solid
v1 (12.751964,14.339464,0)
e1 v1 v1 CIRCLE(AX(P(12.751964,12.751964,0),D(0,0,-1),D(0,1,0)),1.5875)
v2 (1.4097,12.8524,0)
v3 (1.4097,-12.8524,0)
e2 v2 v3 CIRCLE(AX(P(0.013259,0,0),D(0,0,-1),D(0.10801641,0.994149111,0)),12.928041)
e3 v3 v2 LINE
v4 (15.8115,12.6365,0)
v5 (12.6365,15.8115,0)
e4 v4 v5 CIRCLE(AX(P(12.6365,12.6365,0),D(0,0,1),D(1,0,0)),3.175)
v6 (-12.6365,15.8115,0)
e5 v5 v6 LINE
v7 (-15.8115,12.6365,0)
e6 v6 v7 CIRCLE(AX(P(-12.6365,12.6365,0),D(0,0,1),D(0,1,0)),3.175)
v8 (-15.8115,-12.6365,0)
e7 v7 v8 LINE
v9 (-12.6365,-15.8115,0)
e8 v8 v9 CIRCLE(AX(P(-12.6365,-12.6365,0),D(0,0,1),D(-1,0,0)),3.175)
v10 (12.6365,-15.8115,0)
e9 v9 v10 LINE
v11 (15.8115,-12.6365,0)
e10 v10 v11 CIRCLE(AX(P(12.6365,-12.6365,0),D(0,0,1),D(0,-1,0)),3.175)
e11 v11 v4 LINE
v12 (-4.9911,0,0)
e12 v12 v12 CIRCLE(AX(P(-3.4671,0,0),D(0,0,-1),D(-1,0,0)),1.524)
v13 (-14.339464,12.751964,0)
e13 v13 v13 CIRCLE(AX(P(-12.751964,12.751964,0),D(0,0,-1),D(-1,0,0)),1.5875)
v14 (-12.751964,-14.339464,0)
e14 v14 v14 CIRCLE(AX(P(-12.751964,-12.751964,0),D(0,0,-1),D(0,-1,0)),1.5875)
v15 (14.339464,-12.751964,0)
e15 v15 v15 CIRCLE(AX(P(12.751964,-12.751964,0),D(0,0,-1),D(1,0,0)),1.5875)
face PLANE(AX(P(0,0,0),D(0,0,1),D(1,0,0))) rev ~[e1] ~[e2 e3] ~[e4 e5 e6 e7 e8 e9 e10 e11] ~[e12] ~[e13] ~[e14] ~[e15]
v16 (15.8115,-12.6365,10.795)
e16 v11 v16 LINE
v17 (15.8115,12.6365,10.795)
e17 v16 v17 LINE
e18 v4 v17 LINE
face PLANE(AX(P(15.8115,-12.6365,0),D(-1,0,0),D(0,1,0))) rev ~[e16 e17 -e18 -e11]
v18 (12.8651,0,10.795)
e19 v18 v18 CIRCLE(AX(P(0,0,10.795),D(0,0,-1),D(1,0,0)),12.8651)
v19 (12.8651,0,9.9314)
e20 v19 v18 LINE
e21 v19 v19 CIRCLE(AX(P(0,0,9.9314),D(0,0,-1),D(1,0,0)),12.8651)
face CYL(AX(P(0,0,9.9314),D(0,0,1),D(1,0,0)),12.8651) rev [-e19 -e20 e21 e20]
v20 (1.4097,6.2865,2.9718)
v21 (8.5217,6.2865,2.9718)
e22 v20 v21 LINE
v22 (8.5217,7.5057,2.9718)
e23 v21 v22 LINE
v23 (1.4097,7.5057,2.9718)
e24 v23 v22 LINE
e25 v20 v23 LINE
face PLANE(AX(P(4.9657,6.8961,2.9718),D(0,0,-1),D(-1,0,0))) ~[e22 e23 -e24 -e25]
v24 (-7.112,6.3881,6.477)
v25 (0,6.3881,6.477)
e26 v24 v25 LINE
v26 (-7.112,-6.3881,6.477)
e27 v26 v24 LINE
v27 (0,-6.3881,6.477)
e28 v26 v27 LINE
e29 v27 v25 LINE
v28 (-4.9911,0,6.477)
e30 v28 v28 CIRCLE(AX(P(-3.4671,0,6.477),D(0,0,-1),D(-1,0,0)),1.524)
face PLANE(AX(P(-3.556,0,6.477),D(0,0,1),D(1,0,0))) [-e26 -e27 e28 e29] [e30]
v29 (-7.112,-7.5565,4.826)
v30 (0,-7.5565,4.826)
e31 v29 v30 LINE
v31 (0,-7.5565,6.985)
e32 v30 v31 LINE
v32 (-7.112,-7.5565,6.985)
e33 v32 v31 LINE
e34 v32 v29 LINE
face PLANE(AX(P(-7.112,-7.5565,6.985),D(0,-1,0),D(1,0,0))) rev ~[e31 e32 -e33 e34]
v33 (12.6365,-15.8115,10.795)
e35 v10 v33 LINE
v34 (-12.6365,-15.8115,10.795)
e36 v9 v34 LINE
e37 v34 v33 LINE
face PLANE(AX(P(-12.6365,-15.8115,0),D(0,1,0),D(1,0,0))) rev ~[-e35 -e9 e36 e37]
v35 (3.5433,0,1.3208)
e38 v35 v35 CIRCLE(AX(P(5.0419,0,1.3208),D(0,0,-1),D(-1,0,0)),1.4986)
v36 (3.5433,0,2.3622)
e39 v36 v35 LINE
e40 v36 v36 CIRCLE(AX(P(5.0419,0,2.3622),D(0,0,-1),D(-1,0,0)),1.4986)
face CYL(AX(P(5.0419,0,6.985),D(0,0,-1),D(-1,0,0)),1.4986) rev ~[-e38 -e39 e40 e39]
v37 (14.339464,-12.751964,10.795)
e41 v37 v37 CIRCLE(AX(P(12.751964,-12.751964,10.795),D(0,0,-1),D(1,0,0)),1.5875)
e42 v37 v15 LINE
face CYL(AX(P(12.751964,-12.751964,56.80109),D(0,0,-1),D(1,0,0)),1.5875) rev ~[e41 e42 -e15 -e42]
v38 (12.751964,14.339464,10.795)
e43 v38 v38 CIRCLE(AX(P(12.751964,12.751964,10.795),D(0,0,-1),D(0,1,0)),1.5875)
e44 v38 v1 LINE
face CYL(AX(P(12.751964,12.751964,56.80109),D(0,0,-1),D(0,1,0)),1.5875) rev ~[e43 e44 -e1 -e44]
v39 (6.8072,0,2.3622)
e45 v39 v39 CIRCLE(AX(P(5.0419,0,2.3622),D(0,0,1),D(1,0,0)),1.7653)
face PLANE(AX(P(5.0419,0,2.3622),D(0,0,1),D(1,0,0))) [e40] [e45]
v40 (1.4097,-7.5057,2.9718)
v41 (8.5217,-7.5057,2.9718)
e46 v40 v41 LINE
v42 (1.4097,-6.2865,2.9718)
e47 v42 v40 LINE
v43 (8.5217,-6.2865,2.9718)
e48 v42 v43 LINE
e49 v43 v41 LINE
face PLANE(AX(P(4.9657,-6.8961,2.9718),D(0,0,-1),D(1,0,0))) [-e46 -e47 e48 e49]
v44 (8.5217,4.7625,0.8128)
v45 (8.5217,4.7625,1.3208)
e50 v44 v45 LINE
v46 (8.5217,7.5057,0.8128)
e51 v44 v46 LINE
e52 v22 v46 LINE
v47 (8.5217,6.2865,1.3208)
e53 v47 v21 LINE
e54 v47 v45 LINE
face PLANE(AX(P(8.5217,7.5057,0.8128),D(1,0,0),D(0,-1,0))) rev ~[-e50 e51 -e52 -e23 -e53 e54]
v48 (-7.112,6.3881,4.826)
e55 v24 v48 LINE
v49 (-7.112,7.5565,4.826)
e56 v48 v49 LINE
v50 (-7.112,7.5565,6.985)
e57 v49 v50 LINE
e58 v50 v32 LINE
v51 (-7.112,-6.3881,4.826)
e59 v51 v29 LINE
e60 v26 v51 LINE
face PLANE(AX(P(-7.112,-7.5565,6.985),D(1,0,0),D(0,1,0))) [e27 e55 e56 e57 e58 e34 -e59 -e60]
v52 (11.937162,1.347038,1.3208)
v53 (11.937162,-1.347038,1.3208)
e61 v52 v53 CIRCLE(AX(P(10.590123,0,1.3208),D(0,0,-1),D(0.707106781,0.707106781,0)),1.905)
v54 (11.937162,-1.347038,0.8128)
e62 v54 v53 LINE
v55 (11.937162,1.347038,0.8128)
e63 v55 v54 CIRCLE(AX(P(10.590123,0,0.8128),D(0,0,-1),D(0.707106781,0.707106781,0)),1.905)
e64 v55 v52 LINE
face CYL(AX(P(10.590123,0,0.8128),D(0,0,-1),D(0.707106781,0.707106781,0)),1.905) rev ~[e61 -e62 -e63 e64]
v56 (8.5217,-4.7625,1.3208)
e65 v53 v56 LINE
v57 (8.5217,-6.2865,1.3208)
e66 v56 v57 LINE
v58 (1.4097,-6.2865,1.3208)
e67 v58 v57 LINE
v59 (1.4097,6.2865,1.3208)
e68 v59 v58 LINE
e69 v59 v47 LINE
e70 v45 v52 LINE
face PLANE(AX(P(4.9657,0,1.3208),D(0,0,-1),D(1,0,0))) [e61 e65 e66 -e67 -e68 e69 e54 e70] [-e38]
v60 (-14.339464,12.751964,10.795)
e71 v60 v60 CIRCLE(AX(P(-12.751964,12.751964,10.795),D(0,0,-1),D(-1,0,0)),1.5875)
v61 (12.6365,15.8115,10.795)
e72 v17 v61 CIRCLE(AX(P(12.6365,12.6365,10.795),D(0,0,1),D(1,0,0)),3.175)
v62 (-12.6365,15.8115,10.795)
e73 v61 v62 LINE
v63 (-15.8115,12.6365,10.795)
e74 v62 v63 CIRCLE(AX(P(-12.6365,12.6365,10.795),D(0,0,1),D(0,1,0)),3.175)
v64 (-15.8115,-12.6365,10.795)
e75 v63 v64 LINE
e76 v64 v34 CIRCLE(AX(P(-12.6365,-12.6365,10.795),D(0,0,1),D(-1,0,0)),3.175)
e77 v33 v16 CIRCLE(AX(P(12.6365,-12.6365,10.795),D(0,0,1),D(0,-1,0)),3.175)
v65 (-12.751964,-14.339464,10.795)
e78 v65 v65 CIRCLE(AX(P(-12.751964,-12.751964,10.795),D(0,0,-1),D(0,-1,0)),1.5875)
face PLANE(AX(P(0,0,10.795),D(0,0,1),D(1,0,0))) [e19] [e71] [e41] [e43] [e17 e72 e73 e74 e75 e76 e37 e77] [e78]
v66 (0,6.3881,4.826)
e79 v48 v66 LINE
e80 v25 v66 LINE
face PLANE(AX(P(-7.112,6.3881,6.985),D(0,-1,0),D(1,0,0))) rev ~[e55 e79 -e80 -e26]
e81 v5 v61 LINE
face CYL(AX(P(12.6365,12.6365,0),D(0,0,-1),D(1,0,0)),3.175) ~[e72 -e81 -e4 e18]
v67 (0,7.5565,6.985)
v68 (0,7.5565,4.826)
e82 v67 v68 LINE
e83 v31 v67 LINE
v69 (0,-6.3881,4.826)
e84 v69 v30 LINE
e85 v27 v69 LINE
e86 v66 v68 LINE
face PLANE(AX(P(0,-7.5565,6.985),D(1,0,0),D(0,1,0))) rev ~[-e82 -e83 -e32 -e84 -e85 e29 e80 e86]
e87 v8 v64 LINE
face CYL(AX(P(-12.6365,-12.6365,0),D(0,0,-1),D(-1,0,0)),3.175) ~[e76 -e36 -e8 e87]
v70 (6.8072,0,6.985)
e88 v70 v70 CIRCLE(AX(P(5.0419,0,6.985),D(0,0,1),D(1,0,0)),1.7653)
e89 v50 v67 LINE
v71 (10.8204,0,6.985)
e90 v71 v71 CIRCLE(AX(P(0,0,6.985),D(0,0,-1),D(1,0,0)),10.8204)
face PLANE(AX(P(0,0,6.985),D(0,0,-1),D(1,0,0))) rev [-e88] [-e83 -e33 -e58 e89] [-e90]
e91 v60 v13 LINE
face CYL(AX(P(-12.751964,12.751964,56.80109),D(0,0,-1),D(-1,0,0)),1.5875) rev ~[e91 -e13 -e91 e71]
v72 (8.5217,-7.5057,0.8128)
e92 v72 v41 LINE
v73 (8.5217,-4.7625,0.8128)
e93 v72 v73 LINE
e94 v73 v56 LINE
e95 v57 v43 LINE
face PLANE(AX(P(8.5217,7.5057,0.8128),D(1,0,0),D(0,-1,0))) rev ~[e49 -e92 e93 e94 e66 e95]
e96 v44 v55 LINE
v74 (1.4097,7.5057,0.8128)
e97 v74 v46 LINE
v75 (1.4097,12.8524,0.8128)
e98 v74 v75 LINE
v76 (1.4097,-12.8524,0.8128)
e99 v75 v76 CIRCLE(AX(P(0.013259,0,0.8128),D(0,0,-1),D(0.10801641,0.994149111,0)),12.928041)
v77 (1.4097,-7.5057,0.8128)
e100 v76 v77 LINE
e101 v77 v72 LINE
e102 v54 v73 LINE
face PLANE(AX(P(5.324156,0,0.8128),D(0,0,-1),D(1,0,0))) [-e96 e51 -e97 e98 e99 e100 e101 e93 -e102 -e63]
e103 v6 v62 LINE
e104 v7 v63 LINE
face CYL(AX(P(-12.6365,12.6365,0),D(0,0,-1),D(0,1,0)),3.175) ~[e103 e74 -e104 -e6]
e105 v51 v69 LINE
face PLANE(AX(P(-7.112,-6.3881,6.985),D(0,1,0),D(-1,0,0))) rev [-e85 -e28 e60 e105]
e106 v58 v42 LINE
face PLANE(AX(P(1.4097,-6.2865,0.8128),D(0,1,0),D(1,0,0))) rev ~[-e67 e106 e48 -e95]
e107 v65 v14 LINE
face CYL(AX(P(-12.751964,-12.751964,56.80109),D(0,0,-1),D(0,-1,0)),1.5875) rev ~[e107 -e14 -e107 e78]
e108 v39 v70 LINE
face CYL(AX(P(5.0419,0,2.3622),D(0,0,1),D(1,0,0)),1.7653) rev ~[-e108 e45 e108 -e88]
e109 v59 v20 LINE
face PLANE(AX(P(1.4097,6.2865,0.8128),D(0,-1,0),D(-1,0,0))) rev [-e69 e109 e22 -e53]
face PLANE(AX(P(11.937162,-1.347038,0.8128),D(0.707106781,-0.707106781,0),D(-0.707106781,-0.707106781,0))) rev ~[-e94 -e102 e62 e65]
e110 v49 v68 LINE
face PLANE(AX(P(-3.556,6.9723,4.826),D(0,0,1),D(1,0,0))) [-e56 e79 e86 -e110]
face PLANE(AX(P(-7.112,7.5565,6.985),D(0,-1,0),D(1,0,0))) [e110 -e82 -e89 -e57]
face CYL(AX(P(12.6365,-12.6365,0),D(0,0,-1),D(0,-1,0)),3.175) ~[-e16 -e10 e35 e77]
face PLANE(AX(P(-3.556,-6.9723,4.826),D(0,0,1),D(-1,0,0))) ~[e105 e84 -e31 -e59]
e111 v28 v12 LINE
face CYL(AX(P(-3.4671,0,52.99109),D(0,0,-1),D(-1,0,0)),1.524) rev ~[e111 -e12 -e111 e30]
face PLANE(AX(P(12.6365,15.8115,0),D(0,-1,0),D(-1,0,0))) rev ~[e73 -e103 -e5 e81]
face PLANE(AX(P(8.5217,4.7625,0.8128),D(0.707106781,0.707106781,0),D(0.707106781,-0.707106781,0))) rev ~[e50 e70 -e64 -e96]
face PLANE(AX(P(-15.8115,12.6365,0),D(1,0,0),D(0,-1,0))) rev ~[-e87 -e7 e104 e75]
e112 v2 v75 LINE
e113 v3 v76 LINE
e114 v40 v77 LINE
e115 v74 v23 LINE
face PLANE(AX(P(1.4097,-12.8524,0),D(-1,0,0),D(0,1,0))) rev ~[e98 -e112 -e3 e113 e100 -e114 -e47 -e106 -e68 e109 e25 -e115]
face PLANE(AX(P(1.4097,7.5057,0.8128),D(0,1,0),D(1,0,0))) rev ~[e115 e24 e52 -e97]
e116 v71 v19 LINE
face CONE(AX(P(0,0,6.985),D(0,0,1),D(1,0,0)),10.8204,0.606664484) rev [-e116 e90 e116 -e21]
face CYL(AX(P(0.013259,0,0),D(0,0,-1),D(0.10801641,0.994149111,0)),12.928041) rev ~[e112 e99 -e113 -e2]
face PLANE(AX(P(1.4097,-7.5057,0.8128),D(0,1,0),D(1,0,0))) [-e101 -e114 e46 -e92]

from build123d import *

# Parameters (mm, degrees)
F1_DEPTH        = 10.795
F5_D            = 3.175
F5_COPIES_COUNT = 4
F7_D            = 2.9972
F7_CBORE_D      = 3.5306
F7_CBORE_DEPTH  = 4.6228
F9_D            = 3.048
F10_W           = 7.112
F10_H           = 15.113
F11_DEPTH       = 0.508
F12_W           = 7.112
F12_H           = 1.1684
F13_DEPTH       = 2.159
F15_DEPTH       = 0.8128
F16_W           = 7.112
F16_H           = 15.0114
F17_DEPTH       = 0.508
F18_W           = 7.112
F18_H           = 1.2192
F19_DEPTH       = 2.159
F21_DEPTH       = 0.508


# Not quite as in the source:
# - a pattern or mirror of a feature is missing from the dataset's text; its kind, count and spacing are read off the source's solid


with BuildPart() as f1:
    # F0 (on Top) → F1 (new body)
    with BuildSketch(Plane.XY):
        with BuildLine():
            Line((12.6365, 15.8115), (-12.6365, 15.8115))
            ThreePointArc((-12.6365, 15.8115), (-14.8815640303, 14.8815640303), (-15.8115, 12.6365))
            Line((-15.8115, 12.6365), (-15.8115, -12.6365))
            ThreePointArc((-15.8115, -12.6365), (-14.8815640303, -14.8815640303), (-12.6365, -15.8115))
            Line((-12.6365, -15.8115), (12.6365, -15.8115))
            ThreePointArc((12.6365, -15.8115), (14.8815640303, -14.8815640303), (15.8115, -12.6365))
            Line((15.8115, -12.6365), (15.8115, 12.6365))
            ThreePointArc((15.8115, 12.6365), (14.8815640303, 14.8815640303), (12.6365, 15.8115))
        make_face()
    extrude(amount=F1_DEPTH)

    # F2 (on Front) → F3 (revolve, cut)
    with BuildSketch(Plane.XZ):
        Polygon((0, 10.795), (0, 6.985), (10.8204, 6.985), (12.8651, 9.9314), (12.8651, 10.795), align=None)
    revolve(axis=Axis((0, 0, 1.5018361828), (0, 0, -1)), mode=Mode.SUBTRACT)

    # F5 (through all)
    with Locations(Plane.XY.offset(10.795)):
        with Locations((-12.7519636919, 12.7519636919)):
            f5 = Hole(F5_D / 2)

    # F5_copies: F5 ×4 about axis
    f5_copies_axis = Axis((0, 0, 0), (0, 0, 1))
    for i in range(1, F5_COPIES_COUNT):
        add(f5.rotate(f5_copies_axis, i * 360 / F5_COPIES_COUNT), mode=Mode.SUBTRACT)

    # F7 (through all)
    with Locations(Plane.XY.offset(6.985)):
        with Locations((5.0419, 0)):
            CounterBoreHole(F7_D / 2, F7_CBORE_D / 2, F7_CBORE_DEPTH)

    # F9 (through all)
    with Locations(Plane.XY.offset(6.985)):
        with Locations((-3.4671, 0)):
            Hole(F9_D / 2)

    # F10 (on face) → F11 (cut)
    with BuildSketch(Plane.XY.offset(6.985)):
        with Locations((-3.556, 0)):
            Rectangle(F10_W, F10_H)
    extrude(amount=-F11_DEPTH, mode=Mode.SUBTRACT)

    # F12 (on face) → F13 (cut)
    with BuildSketch(Plane.XY.offset(6.985)):
        with Locations((-3.556, 6.9723)):
            Rectangle(F12_W, F12_H)
    f13 = extrude(amount=-F13_DEPTH, mode=Mode.SUBTRACT)

    # F13_copies: F13 across plane
    add(f13.mirror(Plane(origin=(0, 0, 0), x_dir=(0, 0, -1), z_dir=(0, -1, 0))), mode=Mode.SUBTRACT)

    # F14 (on face) → F15 (cut)
    with BuildSketch(Plane(origin=(0, 0, 0), x_dir=(1, 0, 0), z_dir=(0, 0, -1))):
        with BuildLine():
            ThreePointArc((1.4097, -12.8524), (12.9413, 0), (1.4097, 12.8524))
            Line((1.4097, 12.8524), (1.4097, -12.8524))
        make_face()
    extrude(amount=-F15_DEPTH, mode=Mode.SUBTRACT)

    # F16 (on face) → F17 (cut)
    with BuildSketch(Plane(origin=(0, 0, 0.8128), x_dir=(1, 0, 0), z_dir=(0, 0, -1))):
        with Locations((4.9657, 0)):
            Rectangle(F16_W, F16_H)
    extrude(amount=-F17_DEPTH, mode=Mode.SUBTRACT)

    # F18 (on face) → F19 (cut)
    with BuildSketch(Plane(origin=(0, 0, 0.8128), x_dir=(1, 0, 0), z_dir=(0, 0, -1))):
        with Locations((4.9657, 6.8961)):
            Rectangle(F18_W, F18_H)
    f19 = extrude(amount=-F19_DEPTH, mode=Mode.SUBTRACT)

    # F19_copies: F19 across plane
    add(f19.mirror(Plane.ZX), mode=Mode.SUBTRACT)

    # F20 (on face) → F21 (cut, through all)
    with BuildSketch(Plane(origin=(0, 0, 0.8128), x_dir=(1, 0, 0), z_dir=(0, 0, -1))):
        with BuildLine():
            Line((11.9371615818, 1.3470384182), (8.5217, 4.7625))
            Line((8.5217, 4.7625), (8.5217, -4.7625))
            Line((8.5217, -4.7625), (11.9371615818, -1.3470384182))
            ThreePointArc((11.9371615818, -1.3470384182), (12.4951231637, 0), (11.9371615818, 1.3470384182))
        make_face()
    extrude(amount=-F21_DEPTH, mode=Mode.SUBTRACT)


solid = f1.part
